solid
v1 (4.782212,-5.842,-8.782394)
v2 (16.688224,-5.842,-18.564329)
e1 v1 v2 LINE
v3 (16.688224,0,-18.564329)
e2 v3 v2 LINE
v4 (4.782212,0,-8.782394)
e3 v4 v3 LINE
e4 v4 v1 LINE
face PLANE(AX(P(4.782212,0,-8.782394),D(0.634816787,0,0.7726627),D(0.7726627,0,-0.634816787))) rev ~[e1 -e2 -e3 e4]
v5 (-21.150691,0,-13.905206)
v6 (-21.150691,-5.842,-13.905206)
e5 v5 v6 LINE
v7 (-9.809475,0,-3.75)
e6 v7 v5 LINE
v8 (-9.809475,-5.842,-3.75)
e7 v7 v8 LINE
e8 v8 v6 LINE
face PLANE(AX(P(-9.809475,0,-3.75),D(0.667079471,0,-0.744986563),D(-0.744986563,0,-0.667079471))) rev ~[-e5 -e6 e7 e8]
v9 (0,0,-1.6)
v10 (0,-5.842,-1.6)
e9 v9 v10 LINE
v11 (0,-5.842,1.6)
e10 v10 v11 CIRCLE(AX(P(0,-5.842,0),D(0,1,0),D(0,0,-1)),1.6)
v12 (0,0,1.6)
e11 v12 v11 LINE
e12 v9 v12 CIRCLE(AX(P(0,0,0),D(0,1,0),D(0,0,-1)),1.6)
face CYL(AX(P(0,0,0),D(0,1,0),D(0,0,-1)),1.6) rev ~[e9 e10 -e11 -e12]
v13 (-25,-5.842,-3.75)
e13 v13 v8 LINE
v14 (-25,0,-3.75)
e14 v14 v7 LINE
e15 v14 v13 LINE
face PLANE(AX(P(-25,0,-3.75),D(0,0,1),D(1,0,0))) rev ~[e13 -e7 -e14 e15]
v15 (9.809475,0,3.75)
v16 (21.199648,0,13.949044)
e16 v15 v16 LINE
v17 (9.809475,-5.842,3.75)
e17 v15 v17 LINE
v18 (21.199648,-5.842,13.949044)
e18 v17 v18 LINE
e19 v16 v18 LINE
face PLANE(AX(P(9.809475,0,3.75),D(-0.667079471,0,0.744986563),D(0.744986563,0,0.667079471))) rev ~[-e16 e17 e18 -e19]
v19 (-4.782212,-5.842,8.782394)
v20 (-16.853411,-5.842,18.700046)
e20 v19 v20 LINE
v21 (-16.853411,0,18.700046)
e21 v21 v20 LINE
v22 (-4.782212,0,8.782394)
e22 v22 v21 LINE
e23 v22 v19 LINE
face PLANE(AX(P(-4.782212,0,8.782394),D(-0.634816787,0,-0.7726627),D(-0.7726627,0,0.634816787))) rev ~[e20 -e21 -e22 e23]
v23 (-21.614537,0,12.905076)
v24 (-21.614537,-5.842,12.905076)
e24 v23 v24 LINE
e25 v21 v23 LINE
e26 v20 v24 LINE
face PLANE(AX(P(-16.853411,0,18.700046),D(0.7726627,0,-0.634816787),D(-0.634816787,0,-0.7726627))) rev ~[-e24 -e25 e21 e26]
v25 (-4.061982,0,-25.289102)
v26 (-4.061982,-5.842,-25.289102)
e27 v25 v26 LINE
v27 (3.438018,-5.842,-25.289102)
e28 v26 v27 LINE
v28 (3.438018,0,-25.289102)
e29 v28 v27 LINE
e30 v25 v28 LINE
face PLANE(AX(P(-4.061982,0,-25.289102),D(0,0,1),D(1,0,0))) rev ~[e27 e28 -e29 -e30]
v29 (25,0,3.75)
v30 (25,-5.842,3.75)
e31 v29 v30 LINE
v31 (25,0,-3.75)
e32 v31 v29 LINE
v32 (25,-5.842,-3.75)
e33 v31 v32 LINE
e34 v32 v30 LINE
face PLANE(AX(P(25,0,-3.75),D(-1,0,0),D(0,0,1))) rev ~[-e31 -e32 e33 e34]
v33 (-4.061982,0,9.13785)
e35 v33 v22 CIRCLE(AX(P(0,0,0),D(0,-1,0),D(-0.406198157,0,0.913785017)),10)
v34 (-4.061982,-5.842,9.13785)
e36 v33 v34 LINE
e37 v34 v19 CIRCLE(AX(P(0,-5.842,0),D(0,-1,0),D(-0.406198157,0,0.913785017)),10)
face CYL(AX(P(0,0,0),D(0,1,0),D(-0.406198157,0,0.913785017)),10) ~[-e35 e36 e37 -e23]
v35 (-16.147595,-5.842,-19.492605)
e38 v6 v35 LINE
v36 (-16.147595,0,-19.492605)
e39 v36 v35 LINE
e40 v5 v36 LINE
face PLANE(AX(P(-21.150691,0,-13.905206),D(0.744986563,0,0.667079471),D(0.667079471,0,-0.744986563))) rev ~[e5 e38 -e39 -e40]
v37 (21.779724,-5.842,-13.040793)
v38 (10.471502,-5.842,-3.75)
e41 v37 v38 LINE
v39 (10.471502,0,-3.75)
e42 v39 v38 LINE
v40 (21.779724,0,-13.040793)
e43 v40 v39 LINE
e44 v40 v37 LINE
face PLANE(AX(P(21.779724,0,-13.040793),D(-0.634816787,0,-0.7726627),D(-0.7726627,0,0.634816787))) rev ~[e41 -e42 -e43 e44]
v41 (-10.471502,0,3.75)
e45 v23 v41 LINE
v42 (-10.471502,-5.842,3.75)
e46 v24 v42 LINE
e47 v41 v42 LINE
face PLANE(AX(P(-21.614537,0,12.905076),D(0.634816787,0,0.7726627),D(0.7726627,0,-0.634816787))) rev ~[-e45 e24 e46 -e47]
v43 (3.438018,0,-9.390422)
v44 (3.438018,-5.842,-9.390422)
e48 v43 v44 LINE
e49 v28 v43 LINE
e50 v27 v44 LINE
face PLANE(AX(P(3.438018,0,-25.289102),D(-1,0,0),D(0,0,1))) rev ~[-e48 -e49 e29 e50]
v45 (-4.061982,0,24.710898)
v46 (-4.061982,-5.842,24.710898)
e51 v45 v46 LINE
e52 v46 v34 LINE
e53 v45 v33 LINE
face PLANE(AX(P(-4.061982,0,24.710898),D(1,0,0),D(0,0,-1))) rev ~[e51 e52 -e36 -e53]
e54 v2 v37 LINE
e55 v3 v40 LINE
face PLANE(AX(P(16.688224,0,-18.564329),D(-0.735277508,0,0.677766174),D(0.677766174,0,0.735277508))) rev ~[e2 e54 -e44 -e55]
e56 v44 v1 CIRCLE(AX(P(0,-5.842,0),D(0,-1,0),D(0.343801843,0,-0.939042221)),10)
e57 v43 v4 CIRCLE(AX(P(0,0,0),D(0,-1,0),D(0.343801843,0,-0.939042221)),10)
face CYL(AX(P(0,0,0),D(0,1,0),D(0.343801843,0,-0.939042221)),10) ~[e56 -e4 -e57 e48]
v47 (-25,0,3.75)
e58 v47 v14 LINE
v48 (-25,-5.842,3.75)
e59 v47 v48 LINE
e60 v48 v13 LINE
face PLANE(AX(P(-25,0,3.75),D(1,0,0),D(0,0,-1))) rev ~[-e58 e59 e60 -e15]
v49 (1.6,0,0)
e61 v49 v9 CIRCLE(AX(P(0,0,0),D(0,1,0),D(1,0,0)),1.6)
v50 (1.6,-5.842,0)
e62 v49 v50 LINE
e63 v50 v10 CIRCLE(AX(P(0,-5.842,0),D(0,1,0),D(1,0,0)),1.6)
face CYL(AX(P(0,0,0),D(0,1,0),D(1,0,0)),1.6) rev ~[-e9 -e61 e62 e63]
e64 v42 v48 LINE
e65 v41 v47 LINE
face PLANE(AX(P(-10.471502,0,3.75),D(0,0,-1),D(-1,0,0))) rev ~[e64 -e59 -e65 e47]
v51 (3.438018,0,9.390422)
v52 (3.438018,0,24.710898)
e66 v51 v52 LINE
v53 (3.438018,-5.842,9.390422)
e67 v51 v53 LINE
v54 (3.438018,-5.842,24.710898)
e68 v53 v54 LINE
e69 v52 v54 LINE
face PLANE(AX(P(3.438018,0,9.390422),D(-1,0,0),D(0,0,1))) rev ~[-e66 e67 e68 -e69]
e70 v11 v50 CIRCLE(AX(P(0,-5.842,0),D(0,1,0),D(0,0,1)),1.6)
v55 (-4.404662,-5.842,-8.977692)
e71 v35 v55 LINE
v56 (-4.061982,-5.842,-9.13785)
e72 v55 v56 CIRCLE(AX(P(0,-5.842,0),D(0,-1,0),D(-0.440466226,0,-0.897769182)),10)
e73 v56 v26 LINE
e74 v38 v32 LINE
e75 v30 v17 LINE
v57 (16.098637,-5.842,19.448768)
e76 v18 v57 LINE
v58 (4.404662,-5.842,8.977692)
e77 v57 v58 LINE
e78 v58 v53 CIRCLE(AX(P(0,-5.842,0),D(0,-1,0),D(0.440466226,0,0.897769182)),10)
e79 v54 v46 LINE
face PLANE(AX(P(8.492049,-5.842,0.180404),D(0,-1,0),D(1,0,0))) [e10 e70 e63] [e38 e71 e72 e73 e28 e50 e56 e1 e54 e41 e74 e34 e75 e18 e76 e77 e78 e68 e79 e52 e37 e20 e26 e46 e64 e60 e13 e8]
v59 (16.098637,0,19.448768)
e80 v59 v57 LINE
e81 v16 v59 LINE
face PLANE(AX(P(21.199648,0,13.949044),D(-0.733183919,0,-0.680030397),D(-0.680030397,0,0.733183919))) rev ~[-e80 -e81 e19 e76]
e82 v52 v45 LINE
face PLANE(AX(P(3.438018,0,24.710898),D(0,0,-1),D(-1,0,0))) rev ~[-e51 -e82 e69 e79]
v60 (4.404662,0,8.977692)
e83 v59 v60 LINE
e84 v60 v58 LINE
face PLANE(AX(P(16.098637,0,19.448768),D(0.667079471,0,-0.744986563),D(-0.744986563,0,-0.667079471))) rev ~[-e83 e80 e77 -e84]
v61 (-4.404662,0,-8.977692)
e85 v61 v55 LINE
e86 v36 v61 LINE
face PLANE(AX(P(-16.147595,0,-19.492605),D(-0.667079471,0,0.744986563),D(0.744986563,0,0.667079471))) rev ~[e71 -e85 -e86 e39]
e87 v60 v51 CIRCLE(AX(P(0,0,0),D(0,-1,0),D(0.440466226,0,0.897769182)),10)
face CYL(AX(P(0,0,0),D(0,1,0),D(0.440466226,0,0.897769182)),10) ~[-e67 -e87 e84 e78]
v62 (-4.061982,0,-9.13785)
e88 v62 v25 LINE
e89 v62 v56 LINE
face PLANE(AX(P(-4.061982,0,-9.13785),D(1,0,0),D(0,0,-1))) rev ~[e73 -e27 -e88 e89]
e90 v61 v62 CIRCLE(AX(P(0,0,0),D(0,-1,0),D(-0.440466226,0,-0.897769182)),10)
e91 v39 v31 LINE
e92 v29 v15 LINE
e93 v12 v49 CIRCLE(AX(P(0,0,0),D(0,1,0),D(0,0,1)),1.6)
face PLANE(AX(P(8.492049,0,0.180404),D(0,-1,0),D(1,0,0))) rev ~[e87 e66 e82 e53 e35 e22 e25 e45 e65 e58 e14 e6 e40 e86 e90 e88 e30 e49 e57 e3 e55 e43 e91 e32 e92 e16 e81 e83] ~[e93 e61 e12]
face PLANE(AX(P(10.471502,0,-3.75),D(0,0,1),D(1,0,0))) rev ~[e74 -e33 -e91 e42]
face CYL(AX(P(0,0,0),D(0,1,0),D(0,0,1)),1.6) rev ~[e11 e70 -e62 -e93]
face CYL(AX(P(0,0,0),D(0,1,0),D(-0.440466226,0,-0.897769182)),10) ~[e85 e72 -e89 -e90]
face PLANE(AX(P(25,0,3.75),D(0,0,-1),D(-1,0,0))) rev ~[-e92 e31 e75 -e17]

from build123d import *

# Parameters (mm, degrees)
F1_DEPTH = 5.842


with BuildPart() as f1:
    # F0 (on Front) → F1 (new body)
    with BuildSketch(Plane.XZ):
        with BuildLine():
            ThreePointArc((9.5433378796, -2.9874239932), (9.8851752336, -1.5110627392), (10, 0))
            ThreePointArc((10, 0), (9.8508269436, 1.7208162387), (9.4077582946, 3.3902925937))
            Line((9.4077582946, 3.3902925937), (5.7582254442, 0.1224102397))
            Line((5.7582254442, 0.1224102397), (9.5433378796, -2.9874239932))
        make_face()
        with BuildLine():
            ThreePointArc((9.4077582946, 3.3902925937), (9.8508269436, 1.7208162387), (10, 0))
            ThreePointArc((10, 0), (9.8851752336, -1.5110627392), (9.5433378796, -2.9874239932))
            Line((9.5433378796, -2.9874239932), (10.4715017977, -3.75))
            Line((10.4715017977, -3.75), (25, -3.75))
            Line((25, -3.75), (25, 3.75))
            Line((25, 3.75), (9.8094753252, 3.75))
            Line((9.8094753252, 3.75), (9.4077582946, 3.3902925937))
        make_face()
        with BuildLine():
            Line((5.7582254442, 0.1224102397), (9.4077582946, 3.3902925937))
            ThreePointArc((9.4077582946, 3.3902925937), (9.3407348831, 3.57080829), (9.2702481089, 3.75))
            Line((9.2702481089, 3.75), (3.43801843, 3.75))
            Line((3.43801843, 3.75), (3.43801843, 2.0286836526))
            Line((3.43801843, 2.0286836526), (5.7582254442, 0.1224102397))
        make_face()
        with BuildLine():
            ThreePointArc((9.2702481089, 3.75), (9.3407348831, 3.57080829), (9.4077582946, 3.3902925937))
            Line((9.4077582946, 3.3902925937), (9.8094753252, 3.75))
            Line((9.8094753252, 3.75), (9.2702481089, 3.75))
        make_face()
        with BuildLine():
            Line((10.4715017977, -3.75), (9.5433378796, -2.9874239932))
            ThreePointArc((9.5433378796, -2.9874239932), (9.4145172462, -3.3714781657), (9.2702481089, -3.75))
            Line((9.2702481089, -3.75), (10.4715017977, -3.75))
        make_face()
        with BuildLine():
            ThreePointArc((9.2702481089, -3.75), (9.4145172462, -3.3714781657), (9.5433378796, -2.9874239932))
            Line((9.5433378796, -2.9874239932), (5.7582254442, 0.1224102397))
            Line((5.7582254442, 0.1224102397), (3.43801843, -1.9551607454))
            Line((3.43801843, -1.9551607454), (3.43801843, -3.75))
            Line((3.43801843, -3.75), (9.2702481089, -3.75))
        make_face()
        with BuildLine():
            Line((3.43801843, 3.75), (9.2702481089, 3.75))
            ThreePointArc((9.2702481089, 3.75), (7.3200398798, 6.8130034609), (4.4046622613, 8.9776918172))
            Line((4.4046622613, 8.9776918172), (3.43801843, 8.1121349231))
            Line((3.43801843, 8.1121349231), (3.43801843, 3.75))
        make_face()
        with BuildLine():
            ThreePointArc((4.4046622613, 8.9776918172), (7.3200398798, 6.8130034609), (9.2702481089, 3.75))
            Line((9.2702481089, 3.75), (9.8094753252, 3.75))
            Line((9.8094753252, 3.75), (21.1996483638, 13.9490438251))
            Line((21.1996483638, 13.9490438251), (16.0986373051, 19.4487675029))
            Line((16.0986373051, 19.4487675029), (4.4046622613, 8.9776918172))
        make_face()
        Polygon((3.43801843, -1.9551607454), (5.7582254442, 0.1224102397), (3.43801843, 2.0286836526), align=None)
        with BuildLine():
            Line((10.4715017977, -3.75), (9.2702481089, -3.75))
            ThreePointArc((9.2702481089, -3.75), (7.4631867576, -6.6558878763), (4.7822119792, -8.7823942399))
            Line((4.7822119792, -8.7823942399), (16.6882236685, -18.5643289542))
            Line((16.6882236685, -18.5643289542), (21.7797240627, -13.0407931571))
            Line((21.7797240627, -13.0407931571), (10.4715017977, -3.75))
        make_face()
        with BuildLine():
            ThreePointArc((4.7822119792, -8.7823942399), (7.4631867576, -6.6558878763), (9.2702481089, -3.75))
            Line((9.2702481089, -3.75), (3.43801843, -3.75))
            Line((3.43801843, -3.75), (3.43801843, -7.6780098428))
            Line((3.43801843, -7.6780098428), (4.7822119792, -8.7823942399))
        make_face()
        with BuildLine():
            Line((3.43801843, 8.1121349231), (4.4046622613, 8.9776918172))
            ThreePointArc((4.4046622613, 8.9776918172), (3.926766698, 9.1967659152), (3.43801843, 9.3904222096))
            Line((3.43801843, 9.3904222096), (3.43801843, 8.1121349231))
        make_face()
        Polygon((1.3429305817, 3.75), (3.43801843, 3.75), (3.43801843, 8.1121349231), (-0.1050080786, 4.9396209927), align=None)
        Polygon((3.43801843, 2.0286836526), (3.43801843, 3.75), (1.3429305817, 3.75), align=None)
        Polygon((1.4335629107, -3.75), (3.43801843, -1.9551607454), (3.43801843, 2.0286836526), (1.3429305817, 3.75), (-1.4335629107, 3.75), (-4.06198157, 1.3964486531), (-4.06198157, -1.5160378684), (-1.3429305817, -3.75), align=None)
        with BuildLine():
            ThreePointArc((0, 1.6), (1.1313708499, 1.1313708499), (1.6, 0))
            ThreePointArc((1.6, 0), (1.1313708499, -1.1313708499), (0, -1.6))
            ThreePointArc((0, -1.6), (-1.6, 0), (0, 1.6))
        make_face(mode=Mode.SUBTRACT)
        Polygon((3.43801843, -3.75), (3.43801843, -1.9551607454), (1.4335629107, -3.75), align=None)
        with BuildLine():
            ThreePointArc((3.43801843, -9.3904222096), (4.1213434094, -9.1112308994), (4.7822119792, -8.7823942399))
            Line((4.7822119792, -8.7823942399), (3.43801843, -7.6780098428))
            Line((3.43801843, -7.6780098428), (3.43801843, -9.3904222096))
        make_face()
        Polygon((3.43801843, -7.6780098428), (3.43801843, -3.75), (1.4335629107, -3.75), (0.1050080786, -4.9396209927), align=None)
        with BuildLine():
            Line((3.43801843, 8.1121349231), (3.43801843, 9.3904222096))
            ThreePointArc((3.43801843, 9.3904222096), (-0.3365719222, 9.9943343621), (-4.06198157, 9.1378501698))
            Line((-4.06198157, 9.1378501698), (-4.06198157, 8.190655627))
            Line((-4.06198157, 8.190655627), (-0.1050080786, 4.9396209927))
            Line((-0.1050080786, 4.9396209927), (3.43801843, 8.1121349231))
        make_face()
        with BuildLine():
            ThreePointArc((-4.06198157, 9.1378501698), (-0.3365719222, 9.9943343621), (3.43801843, 9.3904222096))
            Line((3.43801843, 9.3904222096), (3.43801843, 24.7108984739))
            Line((3.43801843, 24.7108984739), (-4.06198157, 24.7108984739))
            Line((-4.06198157, 24.7108984739), (-4.06198157, 9.1378501698))
        make_face()
        Polygon((-1.4335629107, 3.75), (1.3429305817, 3.75), (-0.1050080786, 4.9396209927), align=None)
        Polygon((0.1050080786, -4.9396209927), (1.4335629107, -3.75), (-1.3429305817, -3.75), align=None)
        with BuildLine():
            Line((3.43801843, -25.2891015261), (3.43801843, -9.3904222096))
            ThreePointArc((3.43801843, -9.3904222096), (-0.3365719222, -9.9943343621), (-4.06198157, -9.1378501698))
            Line((-4.06198157, -9.1378501698), (-4.06198157, -25.2891015261))
            Line((-4.06198157, -25.2891015261), (3.43801843, -25.2891015261))
        make_face()
        with BuildLine():
            ThreePointArc((-4.06198157, -9.1378501698), (-0.3365719222, -9.9943343621), (3.43801843, -9.3904222096))
            Line((3.43801843, -9.3904222096), (3.43801843, -7.6780098428))
            Line((3.43801843, -7.6780098428), (0.1050080786, -4.9396209927))
            Line((0.1050080786, -4.9396209927), (-4.06198157, -8.6708470153))
            Line((-4.06198157, -8.6708470153), (-4.06198157, -9.1378501698))
        make_face()
        with BuildLine():
            Line((-4.06198157, 8.190655627), (-4.06198157, 9.1378501698))
            ThreePointArc((-4.06198157, 9.1378501698), (-4.4256668552, 8.9673559585), (-4.7822119792, 8.7823942399))
            Line((-4.7822119792, 8.7823942399), (-4.06198157, 8.190655627))
        make_face()
        Polygon((-1.4335629107, 3.75), (-0.1050080786, 4.9396209927), (-4.06198157, 8.190655627), (-4.06198157, 3.75), align=None)
        Polygon((-4.06198157, 1.3964486531), (-1.4335629107, 3.75), (-4.06198157, 3.75), align=None)
        Polygon((-4.06198157, -8.6708470153), (0.1050080786, -4.9396209927), (-1.3429305817, -3.75), (-4.06198157, -3.75), align=None)
        Polygon((-4.06198157, -3.75), (-1.3429305817, -3.75), (-4.06198157, -1.5160378684), align=None)
        with BuildLine():
            ThreePointArc((-4.4046622613, -8.9776918172), (-4.2340792524, -9.0593914191), (-4.06198157, -9.1378501698))
            Line((-4.06198157, -9.1378501698), (-4.06198157, -8.6708470153))
            Line((-4.06198157, -8.6708470153), (-4.4046622613, -8.9776918172))
        make_face()
        with BuildLine():
            Line((-4.06198157, 8.190655627), (-4.7822119792, 8.7823942399))
            ThreePointArc((-4.7822119792, 8.7823942399), (-7.4631867576, 6.6558878763), (-9.2702481089, 3.75))
            Line((-9.2702481089, 3.75), (-4.06198157, 3.75))
            Line((-4.06198157, 3.75), (-4.06198157, 8.190655627))
        make_face()
        with BuildLine():
            ThreePointArc((-9.2702481089, 3.75), (-7.4631867576, 6.6558878763), (-4.7822119792, 8.7823942399))
            Line((-4.7822119792, 8.7823942399), (-16.8534109154, 18.700046179))
            Line((-16.8534109154, 18.700046179), (-21.6145368158, 12.9050759323))
            Line((-21.6145368158, 12.9050759323), (-10.4715017977, 3.75))
            Line((-10.4715017977, 3.75), (-9.2702481089, 3.75))
        make_face()
        with BuildLine():
            Line((-5.7582254442, -0.1224102397), (-4.06198157, 1.3964486531))
            Line((-4.06198157, 1.3964486531), (-4.06198157, 3.75))
            Line((-4.06198157, 3.75), (-9.2702481089, 3.75))
            ThreePointArc((-9.2702481089, 3.75), (-9.4145172462, 3.3714781657), (-9.5433378796, 2.9874239932))
            Line((-9.5433378796, 2.9874239932), (-5.7582254442, -0.1224102397))
        make_face()
        Polygon((-4.06198157, -1.5160378684), (-4.06198157, 1.3964486531), (-5.7582254442, -0.1224102397), align=None)
        with BuildLine():
            Line((-4.4046622613, -8.9776918172), (-4.06198157, -8.6708470153))
            Line((-4.06198157, -8.6708470153), (-4.06198157, -3.75))
            Line((-4.06198157, -3.75), (-9.2702481089, -3.75))
            ThreePointArc((-9.2702481089, -3.75), (-7.3200398798, -6.8130034609), (-4.4046622613, -8.9776918172))
        make_face()
        with BuildLine():
            Line((-9.2702481089, -3.75), (-4.06198157, -3.75))
            Line((-4.06198157, -3.75), (-4.06198157, -1.5160378684))
            Line((-4.06198157, -1.5160378684), (-5.7582254442, -0.1224102397))
            Line((-5.7582254442, -0.1224102397), (-9.4077582946, -3.3902925937))
            ThreePointArc((-9.4077582946, -3.3902925937), (-9.3407348831, -3.57080829), (-9.2702481089, -3.75))
        make_face()
        with BuildLine():
            Line((-16.1475948178, -19.4926052757), (-4.4046622613, -8.9776918172))
            ThreePointArc((-4.4046622613, -8.9776918172), (-7.3200398798, -6.8130034609), (-9.2702481089, -3.75))
            Line((-9.2702481089, -3.75), (-9.8094753252, -3.75))
            Line((-9.8094753252, -3.75), (-21.1506908511, -13.9052060523))
            Line((-21.1506908511, -13.9052060523), (-16.1475948178, -19.4926052757))
        make_face()
        with BuildLine():
            ThreePointArc((-9.5433378796, 2.9874239932), (-9.4145172462, 3.3714781657), (-9.2702481089, 3.75))
            Line((-9.2702481089, 3.75), (-10.4715017977, 3.75))
            Line((-10.4715017977, 3.75), (-9.5433378796, 2.9874239932))
        make_face()
        with BuildLine():
            Line((-9.4077582946, -3.3902925937), (-5.7582254442, -0.1224102397))
            Line((-5.7582254442, -0.1224102397), (-9.5433378796, 2.9874239932))
            ThreePointArc((-9.5433378796, 2.9874239932), (-9.9977411832, -0.2125352519), (-9.4077582946, -3.3902925937))
        make_face()
        with BuildLine():
            Line((-9.8094753252, -3.75), (-9.2702481089, -3.75))
            ThreePointArc((-9.2702481089, -3.75), (-9.3407348831, -3.57080829), (-9.4077582946, -3.3902925937))
            Line((-9.4077582946, -3.3902925937), (-9.8094753252, -3.75))
        make_face()
        with BuildLine():
            ThreePointArc((-9.4077582946, -3.3902925937), (-9.9977411832, -0.2125352519), (-9.5433378796, 2.9874239932))
            Line((-9.5433378796, 2.9874239932), (-10.4715017977, 3.75))
            Line((-10.4715017977, 3.75), (-25, 3.75))
            Line((-25, 3.75), (-25, -3.75))
            Line((-25, -3.75), (-9.8094753252, -3.75))
            Line((-9.8094753252, -3.75), (-9.4077582946, -3.3902925937))
        make_face()
    extrude(amount=F1_DEPTH)


solid = f1.part
